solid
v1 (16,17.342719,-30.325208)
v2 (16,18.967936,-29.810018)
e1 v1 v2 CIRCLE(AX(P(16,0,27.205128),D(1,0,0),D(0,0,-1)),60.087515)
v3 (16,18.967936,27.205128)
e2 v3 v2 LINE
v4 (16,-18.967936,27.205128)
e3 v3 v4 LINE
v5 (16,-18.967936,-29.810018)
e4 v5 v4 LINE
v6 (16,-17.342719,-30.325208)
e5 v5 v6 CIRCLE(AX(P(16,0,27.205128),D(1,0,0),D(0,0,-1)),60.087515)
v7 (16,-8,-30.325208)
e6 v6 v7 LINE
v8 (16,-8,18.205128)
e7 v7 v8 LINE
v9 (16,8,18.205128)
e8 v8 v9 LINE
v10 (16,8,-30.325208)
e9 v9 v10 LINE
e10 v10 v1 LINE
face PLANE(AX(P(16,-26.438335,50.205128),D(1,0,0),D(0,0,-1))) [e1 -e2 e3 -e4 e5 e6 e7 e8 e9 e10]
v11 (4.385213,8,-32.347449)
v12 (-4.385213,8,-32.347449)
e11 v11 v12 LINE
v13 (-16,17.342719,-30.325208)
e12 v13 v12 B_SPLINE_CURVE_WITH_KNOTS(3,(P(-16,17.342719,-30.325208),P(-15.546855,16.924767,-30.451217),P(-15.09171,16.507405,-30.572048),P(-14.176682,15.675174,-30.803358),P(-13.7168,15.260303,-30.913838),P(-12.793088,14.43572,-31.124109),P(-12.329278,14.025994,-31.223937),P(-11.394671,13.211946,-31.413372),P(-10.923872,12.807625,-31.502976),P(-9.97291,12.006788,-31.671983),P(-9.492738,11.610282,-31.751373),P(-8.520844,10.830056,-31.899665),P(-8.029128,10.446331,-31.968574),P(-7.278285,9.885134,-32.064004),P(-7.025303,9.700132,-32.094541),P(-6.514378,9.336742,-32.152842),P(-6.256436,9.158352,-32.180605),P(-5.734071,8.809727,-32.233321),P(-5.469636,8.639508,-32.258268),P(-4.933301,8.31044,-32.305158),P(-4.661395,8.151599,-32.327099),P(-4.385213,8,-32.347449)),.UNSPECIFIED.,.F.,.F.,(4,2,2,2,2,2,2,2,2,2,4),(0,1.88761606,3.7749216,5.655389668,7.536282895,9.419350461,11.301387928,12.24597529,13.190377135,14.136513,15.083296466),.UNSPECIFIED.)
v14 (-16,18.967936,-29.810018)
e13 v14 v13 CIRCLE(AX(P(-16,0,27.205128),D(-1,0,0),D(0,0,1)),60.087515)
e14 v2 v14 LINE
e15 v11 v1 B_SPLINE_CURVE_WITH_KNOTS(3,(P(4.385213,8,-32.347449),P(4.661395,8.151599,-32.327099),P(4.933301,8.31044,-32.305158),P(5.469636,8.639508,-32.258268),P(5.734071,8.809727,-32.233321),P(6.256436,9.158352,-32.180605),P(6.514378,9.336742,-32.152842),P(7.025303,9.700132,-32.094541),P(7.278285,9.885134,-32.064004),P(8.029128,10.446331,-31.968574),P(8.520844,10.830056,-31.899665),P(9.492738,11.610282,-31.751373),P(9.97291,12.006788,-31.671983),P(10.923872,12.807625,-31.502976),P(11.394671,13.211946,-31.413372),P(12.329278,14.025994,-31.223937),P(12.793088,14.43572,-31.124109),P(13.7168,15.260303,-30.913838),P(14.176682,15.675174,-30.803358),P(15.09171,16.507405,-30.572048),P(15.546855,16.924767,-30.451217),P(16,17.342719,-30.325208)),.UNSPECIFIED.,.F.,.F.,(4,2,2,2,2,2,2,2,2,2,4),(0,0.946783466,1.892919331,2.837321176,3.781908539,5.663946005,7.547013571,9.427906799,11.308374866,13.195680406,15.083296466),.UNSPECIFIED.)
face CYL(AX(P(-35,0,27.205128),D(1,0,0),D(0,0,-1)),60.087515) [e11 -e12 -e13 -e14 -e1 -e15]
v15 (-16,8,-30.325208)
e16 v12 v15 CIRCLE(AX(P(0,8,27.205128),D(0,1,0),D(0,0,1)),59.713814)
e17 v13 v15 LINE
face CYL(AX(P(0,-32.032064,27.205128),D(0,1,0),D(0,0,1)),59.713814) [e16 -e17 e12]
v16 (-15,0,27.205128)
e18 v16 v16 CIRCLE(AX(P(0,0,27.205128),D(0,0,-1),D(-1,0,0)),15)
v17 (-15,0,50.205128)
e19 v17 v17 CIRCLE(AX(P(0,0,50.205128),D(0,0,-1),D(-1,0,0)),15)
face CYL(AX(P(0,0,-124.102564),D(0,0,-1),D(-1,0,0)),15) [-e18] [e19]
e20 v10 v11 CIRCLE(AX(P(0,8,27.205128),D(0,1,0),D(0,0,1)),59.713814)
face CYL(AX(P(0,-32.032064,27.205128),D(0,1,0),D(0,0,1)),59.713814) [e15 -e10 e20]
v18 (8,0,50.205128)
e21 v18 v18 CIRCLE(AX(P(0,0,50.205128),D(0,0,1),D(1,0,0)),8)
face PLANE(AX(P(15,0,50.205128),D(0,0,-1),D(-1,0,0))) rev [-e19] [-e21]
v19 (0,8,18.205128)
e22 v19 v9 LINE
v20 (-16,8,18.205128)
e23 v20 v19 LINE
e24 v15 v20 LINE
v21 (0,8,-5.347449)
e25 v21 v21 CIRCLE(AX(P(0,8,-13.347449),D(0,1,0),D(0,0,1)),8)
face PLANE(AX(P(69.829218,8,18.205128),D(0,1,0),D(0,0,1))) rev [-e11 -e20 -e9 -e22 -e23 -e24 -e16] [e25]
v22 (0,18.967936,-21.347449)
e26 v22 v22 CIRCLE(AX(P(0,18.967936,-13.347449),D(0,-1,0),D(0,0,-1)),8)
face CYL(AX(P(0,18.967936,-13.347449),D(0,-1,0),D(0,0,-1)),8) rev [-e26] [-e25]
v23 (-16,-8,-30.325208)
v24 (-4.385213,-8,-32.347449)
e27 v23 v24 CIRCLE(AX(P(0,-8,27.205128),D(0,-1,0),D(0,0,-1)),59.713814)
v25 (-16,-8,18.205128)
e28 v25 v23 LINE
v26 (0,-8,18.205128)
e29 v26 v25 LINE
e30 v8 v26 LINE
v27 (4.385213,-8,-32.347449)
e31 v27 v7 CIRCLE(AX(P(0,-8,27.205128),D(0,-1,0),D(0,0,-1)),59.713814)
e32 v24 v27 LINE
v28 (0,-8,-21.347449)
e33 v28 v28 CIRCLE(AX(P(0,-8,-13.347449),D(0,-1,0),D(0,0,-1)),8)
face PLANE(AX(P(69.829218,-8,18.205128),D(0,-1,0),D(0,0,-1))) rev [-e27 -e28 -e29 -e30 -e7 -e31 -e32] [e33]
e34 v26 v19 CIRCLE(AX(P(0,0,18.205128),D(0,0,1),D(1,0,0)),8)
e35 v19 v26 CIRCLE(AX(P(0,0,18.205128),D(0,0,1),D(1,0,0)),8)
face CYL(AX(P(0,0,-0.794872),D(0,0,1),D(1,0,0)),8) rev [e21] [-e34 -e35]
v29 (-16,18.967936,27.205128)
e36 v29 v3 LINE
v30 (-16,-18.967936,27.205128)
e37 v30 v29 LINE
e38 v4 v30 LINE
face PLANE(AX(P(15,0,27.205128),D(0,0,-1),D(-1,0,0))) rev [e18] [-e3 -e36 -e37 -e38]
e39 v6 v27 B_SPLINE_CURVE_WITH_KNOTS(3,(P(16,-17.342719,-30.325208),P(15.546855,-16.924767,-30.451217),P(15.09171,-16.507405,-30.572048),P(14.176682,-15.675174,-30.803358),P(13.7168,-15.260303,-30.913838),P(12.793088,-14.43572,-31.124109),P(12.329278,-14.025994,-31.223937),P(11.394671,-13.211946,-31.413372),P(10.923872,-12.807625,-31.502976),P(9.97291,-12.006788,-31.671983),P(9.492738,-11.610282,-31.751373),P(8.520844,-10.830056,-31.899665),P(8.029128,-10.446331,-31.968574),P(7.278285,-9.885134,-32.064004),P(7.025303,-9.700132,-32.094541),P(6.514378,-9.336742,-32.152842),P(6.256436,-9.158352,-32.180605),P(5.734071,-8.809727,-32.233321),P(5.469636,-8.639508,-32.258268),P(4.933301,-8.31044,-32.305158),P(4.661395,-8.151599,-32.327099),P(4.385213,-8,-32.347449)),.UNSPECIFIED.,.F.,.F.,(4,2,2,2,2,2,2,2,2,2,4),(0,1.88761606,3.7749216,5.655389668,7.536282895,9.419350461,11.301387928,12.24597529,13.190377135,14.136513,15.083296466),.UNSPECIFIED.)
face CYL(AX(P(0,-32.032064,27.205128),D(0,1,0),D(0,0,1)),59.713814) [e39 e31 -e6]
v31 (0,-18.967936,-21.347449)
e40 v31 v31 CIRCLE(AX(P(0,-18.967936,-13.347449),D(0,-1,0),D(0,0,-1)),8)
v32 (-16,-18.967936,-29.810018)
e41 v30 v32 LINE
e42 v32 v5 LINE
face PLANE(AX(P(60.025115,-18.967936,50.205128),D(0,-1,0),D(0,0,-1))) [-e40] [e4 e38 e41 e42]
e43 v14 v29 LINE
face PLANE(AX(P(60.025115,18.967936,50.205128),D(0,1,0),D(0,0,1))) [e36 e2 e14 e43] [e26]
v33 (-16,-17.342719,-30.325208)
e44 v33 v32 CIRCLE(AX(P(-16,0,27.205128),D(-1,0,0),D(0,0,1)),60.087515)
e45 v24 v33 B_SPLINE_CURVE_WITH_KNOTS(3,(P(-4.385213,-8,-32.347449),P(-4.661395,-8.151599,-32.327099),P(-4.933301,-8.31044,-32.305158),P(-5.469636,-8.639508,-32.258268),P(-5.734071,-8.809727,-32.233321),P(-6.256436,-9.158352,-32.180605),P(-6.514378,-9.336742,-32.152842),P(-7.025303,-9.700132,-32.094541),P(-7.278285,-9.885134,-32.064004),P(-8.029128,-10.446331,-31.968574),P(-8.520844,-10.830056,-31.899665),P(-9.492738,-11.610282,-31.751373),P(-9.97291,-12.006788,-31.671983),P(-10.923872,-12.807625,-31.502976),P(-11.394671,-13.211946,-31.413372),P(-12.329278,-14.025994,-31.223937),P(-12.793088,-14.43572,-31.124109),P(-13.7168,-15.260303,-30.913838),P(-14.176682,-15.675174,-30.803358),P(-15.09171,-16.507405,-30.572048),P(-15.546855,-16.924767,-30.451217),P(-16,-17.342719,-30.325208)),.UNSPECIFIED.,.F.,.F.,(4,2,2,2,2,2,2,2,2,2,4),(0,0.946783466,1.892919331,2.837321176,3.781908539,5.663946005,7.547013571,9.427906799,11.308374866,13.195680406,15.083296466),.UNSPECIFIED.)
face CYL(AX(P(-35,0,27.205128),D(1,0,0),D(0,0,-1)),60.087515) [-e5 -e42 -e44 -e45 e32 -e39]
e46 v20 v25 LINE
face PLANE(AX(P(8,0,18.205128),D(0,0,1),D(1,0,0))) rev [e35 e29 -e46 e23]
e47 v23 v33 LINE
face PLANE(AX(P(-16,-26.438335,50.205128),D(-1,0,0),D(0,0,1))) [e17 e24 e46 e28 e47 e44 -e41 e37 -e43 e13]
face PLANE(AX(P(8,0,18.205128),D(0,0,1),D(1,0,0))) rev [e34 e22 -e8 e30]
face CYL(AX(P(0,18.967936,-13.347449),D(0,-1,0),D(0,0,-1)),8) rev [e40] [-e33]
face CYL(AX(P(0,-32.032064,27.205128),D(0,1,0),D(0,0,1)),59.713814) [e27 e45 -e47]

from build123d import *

# Parameters (mm, degrees)
CROQUIS3_W            = 139.658435228
CROQUIS3_H            = 16
CORTAR_EXTRUIR1_DEPTH = 51
CROQUIS4_OUTSIDE_W    = 126.9
CROQUIS4_OUTSIDE_H    = 126.9
CROQUIS4_OUTSIDE_W_2  = 120.050230854
CROQUIS4_OUTSIDE_H_2  = 37.93587295
CORTAR_EXTRUIR2_DEPTH = 107.175895765
CROQUIS5_OUTSIDE_W    = 121.792
CROQUIS5_OUTSIDE_H    = 66.086
CROQUIS5_OUTSIDE_W_2  = 32
CROQUIS5_OUTSIDE_H_2  = 52.876669862
CORTAR_EXTRUIR4_DEPTH = 98.164515307
CROQUIS6_OUTSIDE_W    = 53.342
CROQUIS6_OUTSIDE_H    = 104.342
CROQUIS6_OUTSIDE_R    = 59.713814124
CORTAR_EXTRUIR5_DEPTH = 51
CORTAR_EXTRUIR6_START = -32
CORTAR_EXTRUIR6_DEPTH = 33
CROQUIS8_R            = 8
CORTAR_EXTRUIR7_DEPTH = 65.928309429
CROQUIS9_R            = 8
CORTAR_EXTRUIR8_DEPTH = 51


with BuildPart() as part:
    # Croquis1 → Revolución2 (revolve)
    with BuildSketch(Plane(origin=(0, 0, 0), x_dir=(1, 0, 0), z_dir=(0, 1, 0)), mode=Mode.PRIVATE) as revoluci_n2_sk:
        Polygon((15, -50.205128205), (0, -50.205128205), (0, -18.205128205), (8, -18.205128205), (8, 32.794871795), (46.820512821, 32.794871795), (46.820512821, -27.205128205), (15, -27.205128205), align=None)
    revolve(revoluci_n2_sk.sketch.rotate(Axis((0, 0, -124.102564103), (0, 0, 1)), 180), axis=Axis((0, 0, -124.102564103), (0, 0, 1)))

    # Croquis3 → Cortar-Extruir1 (cut)
    with BuildSketch(Plane(origin=(0, 0, -32.794871795), x_dir=(-1, 0, 0), z_dir=(0, 0, -1))):
        Rectangle(CROQUIS3_W, CROQUIS3_H)
    extrude(amount=-CORTAR_EXTRUIR1_DEPTH, mode=Mode.SUBTRACT)

    # Croquis4 outside → Cortar-Extruir2 (cut, through all)
    with BuildSketch(Plane(origin=(0, 0, -32.794871795), x_dir=(-1, 0, 0), z_dir=(0, 0, -1))):
        Rectangle(CROQUIS4_OUTSIDE_W, CROQUIS4_OUTSIDE_H)
        Rectangle(CROQUIS4_OUTSIDE_W_2, CROQUIS4_OUTSIDE_H_2, mode=Mode.SUBTRACT)
    extrude(amount=-CORTAR_EXTRUIR2_DEPTH, mode=Mode.SUBTRACT)

    # Croquis5 outside → Cortar-Extruir4 (cut, through all)
    with BuildSketch(Plane(origin=(0, 0, -32.794871795), x_dir=(-1, 0, 0), z_dir=(0, 0, -1))):
        Rectangle(CROQUIS5_OUTSIDE_W, CROQUIS5_OUTSIDE_H)
        Rectangle(CROQUIS5_OUTSIDE_W_2, CROQUIS5_OUTSIDE_H_2, mode=Mode.SUBTRACT)
    extrude(amount=-CORTAR_EXTRUIR4_DEPTH, mode=Mode.SUBTRACT)

    # Croquis6 outside → Cortar-Extruir5 (cut)
    with BuildSketch(Plane(origin=(0, 18.967936475, 0), x_dir=(1, 0, 0), z_dir=(0, 1, 0))):
        with Locations((0, -8.705)):
            Rectangle(CROQUIS6_OUTSIDE_W, CROQUIS6_OUTSIDE_H)
        with Locations((0, -27.205128205)):
            Circle(CROQUIS6_OUTSIDE_R, mode=Mode.SUBTRACT)
    extrude(amount=-CORTAR_EXTRUIR5_DEPTH, mode=Mode.SUBTRACT)


with BuildPart() as cortar_extruir5_kept_piece:
    # of the separate pieces the step leaves, the one the design keeps (cortar_extruir5_pieces_kept)
    add(part.part.solids().sort_by_distance((-15, 0, 50.205128205))[0])

    # Cortar-Extruir6: read off the stored shape, not the designer's step
    # Cortar-Extruir6 outline → Cortar-Extruir6 (cut)
    with BuildSketch(Plane(origin=(16, 0, 0), x_dir=(0, 0, -1), z_dir=(1, 0, 0)).offset(CORTAR_EXTRUIR6_START)):
        with BuildLine():
            ThreePointArc((29.810017934, 18.967936475), (31.336160338, 13.54352388), (32.347449433, 8))
            Line((32.347449433, 8), (33.422130035, 0))
            Line((33.422130035, 0), (34, 4.301705749))
            Line((34, 4.301705749), (34, 20))
            Line((34, 20), (29.466668549, 20))
            Line((29.466668549, 20), (29.810017934, 18.967936475))
        make_face()
        with BuildLine():
            Line((34, -4.301705749), (33.422130035, 0))
            Line((33.422130035, 0), (32.347449433, -8))
            ThreePointArc((32.347449433, -8), (31.336160338, -13.54352388), (29.810017934, -18.967936475))
            Line((29.810017934, -18.967936475), (29.466668549, -20))
            Line((29.466668549, -20), (34, -20))
            Line((34, -20), (34, -4.301705749))
        make_face()
    extrude(amount=CORTAR_EXTRUIR6_DEPTH, mode=Mode.SUBTRACT)

    # Croquis8 → Cortar-Extruir7 (cut, through all)
    with BuildSketch(Plane.XZ.offset(18.967936475)):
        with Locations(Location((0, -13.347449433, 0), (0, 0, 270))):
            Circle(CROQUIS8_R)
    extrude(amount=-CORTAR_EXTRUIR7_DEPTH, mode=Mode.SUBTRACT)

    # Croquis9 → Cortar-Extruir8 (cut)
    with BuildSketch(Plane.XY.offset(50.205128205)):
        Circle(CROQUIS9_R)
    extrude(amount=-CORTAR_EXTRUIR8_DEPTH, mode=Mode.SUBTRACT)


solid = cortar_extruir5_kept_piece.part
